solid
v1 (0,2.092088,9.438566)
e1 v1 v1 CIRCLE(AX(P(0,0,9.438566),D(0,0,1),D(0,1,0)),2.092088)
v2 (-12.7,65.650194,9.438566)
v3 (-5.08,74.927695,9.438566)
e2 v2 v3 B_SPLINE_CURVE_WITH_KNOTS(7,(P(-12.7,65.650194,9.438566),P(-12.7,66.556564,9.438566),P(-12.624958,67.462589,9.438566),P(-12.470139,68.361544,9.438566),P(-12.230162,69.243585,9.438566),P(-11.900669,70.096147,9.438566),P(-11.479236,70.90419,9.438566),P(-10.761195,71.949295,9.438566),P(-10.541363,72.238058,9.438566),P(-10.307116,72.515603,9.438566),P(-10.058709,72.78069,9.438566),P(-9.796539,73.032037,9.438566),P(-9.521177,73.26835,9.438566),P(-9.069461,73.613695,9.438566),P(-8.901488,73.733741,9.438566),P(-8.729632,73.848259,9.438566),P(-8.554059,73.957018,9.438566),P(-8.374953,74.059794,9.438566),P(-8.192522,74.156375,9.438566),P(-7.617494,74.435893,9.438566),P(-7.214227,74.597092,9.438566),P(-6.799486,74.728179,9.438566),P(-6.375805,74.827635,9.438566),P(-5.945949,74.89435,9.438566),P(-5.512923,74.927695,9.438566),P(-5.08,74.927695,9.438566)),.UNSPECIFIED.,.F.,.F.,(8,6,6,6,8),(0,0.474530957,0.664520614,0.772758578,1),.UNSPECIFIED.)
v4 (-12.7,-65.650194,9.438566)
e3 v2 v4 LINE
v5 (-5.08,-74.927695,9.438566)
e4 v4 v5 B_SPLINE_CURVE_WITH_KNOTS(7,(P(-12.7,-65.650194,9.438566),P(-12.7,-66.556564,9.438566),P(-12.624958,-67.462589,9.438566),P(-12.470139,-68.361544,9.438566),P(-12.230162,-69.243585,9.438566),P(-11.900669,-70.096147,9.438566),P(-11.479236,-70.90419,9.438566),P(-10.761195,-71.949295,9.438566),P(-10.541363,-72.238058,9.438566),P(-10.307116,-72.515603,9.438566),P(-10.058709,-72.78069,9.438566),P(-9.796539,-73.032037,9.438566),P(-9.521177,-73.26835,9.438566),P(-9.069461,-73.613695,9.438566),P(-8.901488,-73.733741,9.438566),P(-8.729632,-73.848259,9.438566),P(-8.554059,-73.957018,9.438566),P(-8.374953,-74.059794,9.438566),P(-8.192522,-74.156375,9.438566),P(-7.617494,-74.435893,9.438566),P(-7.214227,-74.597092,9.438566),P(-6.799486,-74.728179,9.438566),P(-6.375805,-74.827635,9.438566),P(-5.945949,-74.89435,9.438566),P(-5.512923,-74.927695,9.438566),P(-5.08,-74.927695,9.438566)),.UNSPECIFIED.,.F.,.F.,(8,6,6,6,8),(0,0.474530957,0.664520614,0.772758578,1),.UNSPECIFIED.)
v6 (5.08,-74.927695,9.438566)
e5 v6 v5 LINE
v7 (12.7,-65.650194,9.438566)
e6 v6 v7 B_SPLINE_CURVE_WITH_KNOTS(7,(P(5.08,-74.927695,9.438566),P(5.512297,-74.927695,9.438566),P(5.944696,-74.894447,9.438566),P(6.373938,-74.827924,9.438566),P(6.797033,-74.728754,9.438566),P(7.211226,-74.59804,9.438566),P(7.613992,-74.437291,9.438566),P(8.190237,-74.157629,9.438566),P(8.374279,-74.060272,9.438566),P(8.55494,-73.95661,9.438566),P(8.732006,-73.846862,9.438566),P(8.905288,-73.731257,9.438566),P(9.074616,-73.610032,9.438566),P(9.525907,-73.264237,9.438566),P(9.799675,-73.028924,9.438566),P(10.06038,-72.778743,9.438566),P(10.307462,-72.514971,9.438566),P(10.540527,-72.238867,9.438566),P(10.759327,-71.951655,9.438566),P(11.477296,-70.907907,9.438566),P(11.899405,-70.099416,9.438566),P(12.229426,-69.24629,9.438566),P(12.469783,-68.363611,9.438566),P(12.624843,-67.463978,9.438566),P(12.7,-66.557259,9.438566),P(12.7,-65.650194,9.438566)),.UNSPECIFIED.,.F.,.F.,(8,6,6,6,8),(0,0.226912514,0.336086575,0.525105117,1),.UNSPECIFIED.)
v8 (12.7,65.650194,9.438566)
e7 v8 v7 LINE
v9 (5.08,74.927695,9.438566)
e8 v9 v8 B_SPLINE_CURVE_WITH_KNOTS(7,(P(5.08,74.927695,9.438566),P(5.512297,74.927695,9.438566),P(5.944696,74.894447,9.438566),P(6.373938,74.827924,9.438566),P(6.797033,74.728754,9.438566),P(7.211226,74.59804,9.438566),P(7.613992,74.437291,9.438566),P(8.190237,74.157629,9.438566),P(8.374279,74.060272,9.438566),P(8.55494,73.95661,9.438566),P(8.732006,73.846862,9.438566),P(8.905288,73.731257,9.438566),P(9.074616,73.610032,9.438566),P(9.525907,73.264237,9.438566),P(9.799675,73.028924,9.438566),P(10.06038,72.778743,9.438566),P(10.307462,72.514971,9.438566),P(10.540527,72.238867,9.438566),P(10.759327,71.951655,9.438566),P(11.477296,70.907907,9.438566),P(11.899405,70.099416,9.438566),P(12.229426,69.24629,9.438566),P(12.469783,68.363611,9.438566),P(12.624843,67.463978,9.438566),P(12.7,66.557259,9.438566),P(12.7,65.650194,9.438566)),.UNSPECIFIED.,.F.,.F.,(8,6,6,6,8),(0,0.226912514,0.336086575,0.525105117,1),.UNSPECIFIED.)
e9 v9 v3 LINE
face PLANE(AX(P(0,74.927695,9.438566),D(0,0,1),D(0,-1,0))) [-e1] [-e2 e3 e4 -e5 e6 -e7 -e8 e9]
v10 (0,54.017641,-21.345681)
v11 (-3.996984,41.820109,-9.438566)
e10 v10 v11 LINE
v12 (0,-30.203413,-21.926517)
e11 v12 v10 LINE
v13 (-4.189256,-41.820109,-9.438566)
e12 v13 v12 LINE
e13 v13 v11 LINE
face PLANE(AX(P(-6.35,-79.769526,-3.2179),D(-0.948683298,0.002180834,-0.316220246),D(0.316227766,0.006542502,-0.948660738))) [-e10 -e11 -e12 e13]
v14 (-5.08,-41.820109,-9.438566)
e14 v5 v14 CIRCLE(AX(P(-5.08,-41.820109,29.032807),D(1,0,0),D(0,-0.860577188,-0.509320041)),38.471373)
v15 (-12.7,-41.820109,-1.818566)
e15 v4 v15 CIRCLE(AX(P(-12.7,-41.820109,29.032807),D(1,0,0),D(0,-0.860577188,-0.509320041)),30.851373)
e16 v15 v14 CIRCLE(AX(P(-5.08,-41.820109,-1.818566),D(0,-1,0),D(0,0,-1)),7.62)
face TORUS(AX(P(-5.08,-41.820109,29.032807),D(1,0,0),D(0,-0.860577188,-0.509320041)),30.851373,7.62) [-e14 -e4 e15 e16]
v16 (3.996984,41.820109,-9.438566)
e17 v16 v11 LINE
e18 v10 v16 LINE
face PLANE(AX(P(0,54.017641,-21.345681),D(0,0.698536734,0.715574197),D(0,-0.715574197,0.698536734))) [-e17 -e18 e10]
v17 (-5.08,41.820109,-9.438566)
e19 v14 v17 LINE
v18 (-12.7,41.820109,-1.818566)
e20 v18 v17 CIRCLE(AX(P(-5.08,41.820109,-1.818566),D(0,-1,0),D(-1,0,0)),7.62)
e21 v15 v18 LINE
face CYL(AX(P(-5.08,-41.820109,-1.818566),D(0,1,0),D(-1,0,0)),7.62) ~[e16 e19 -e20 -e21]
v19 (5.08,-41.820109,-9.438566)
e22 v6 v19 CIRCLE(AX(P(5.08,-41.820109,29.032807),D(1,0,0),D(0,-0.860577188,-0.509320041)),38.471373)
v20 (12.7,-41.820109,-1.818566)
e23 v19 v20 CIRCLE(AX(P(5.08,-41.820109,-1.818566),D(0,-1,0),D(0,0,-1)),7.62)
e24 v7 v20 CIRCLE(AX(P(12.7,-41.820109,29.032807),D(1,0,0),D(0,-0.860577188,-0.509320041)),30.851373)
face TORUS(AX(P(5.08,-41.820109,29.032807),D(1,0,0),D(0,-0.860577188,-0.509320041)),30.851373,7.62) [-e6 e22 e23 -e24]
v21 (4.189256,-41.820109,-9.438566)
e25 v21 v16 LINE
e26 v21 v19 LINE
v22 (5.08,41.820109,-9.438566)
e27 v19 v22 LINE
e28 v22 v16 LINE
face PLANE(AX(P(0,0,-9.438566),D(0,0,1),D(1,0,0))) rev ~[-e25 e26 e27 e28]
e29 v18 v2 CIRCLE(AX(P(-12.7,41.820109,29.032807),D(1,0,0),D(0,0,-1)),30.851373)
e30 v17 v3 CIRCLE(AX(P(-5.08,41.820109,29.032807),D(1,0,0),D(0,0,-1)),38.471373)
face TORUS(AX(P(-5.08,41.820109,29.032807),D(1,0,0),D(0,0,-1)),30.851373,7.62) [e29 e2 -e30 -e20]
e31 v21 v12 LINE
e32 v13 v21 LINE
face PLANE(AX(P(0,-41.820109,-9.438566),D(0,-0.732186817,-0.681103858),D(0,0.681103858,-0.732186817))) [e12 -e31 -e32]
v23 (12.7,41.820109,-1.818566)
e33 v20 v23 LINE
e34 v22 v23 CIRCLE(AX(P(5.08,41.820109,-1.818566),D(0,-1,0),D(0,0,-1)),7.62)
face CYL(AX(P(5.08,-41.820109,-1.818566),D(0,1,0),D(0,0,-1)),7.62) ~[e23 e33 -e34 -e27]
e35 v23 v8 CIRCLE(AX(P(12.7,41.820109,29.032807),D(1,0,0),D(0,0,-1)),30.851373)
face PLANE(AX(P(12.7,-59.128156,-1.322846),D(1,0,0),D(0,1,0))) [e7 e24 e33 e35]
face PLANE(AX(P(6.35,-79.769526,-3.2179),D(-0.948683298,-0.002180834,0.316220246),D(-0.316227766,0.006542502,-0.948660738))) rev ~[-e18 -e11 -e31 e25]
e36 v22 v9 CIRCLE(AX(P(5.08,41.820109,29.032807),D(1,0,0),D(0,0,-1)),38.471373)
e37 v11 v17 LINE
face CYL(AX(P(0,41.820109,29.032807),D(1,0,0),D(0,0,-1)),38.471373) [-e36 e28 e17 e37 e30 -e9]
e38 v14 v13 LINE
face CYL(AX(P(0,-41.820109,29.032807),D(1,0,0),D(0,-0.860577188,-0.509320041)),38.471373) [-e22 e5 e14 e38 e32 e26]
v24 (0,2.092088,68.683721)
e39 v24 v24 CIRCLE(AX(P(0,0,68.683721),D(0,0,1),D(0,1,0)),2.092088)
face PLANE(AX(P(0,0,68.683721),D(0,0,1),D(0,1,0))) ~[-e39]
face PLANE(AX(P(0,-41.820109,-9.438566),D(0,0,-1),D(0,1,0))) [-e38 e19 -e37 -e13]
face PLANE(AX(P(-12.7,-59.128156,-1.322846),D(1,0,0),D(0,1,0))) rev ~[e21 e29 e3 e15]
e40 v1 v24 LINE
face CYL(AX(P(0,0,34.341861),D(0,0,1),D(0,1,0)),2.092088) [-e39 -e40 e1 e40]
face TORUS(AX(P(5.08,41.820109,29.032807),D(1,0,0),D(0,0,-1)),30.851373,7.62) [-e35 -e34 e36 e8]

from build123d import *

# Parameters (mm, degrees)
F0_W        = 83.6402177811
F0_H        = 18.8771318644
F1_DEPTH    = 12.7
F2_DEPTH    = 6.35
F3_T4_DEPTH = 183.094881238
F4_T4_DEPTH = 183.094881238
F5_R        = 7.62
F6_R        = 7.62
F7_W        = 2.0920878742
F7_H        = 68.6837211251


# Not quite as in the source:
# - a fillet or chamfer that OpenCascade refuses, or shapes differently, is made with other operations: its cross-section is extruded or revolved along the edge and cut away or added


with BuildPart() as f1:
    # F0 (on Right) → F1 (new body, symmetric)
    with BuildSketch(Plane.YZ):
        with BuildLine():
            ThreePointArc((-74.9276950955, 9.4385659322), (-60.8756748212, -4.3877247968), (-41.8201088905, -9.4385659322))
            Line((-41.8201088905, -9.4385659322), (-74.9276950955, 9.4385659322))
        make_face()
        with BuildLine():
            Line((74.9276950955, 9.4385659322), (41.8201088905, -9.4385659322))
            ThreePointArc((41.8201088905, -9.4385659322), (60.8756748212, -4.3877247968), (74.9276950955, 9.4385659322))
        make_face()
        Polygon((74.9276950955, 9.4385659322), (41.8201088905, 9.4385659322), (41.8201088905, -9.4385659322), align=None)
        Rectangle(F0_W, F0_H)
        Polygon((-41.8201088905, -9.4385659322), (-41.8201088905, 9.4385659322), (-74.9276950955, 9.4385659322), align=None)
    extrude(amount=F1_DEPTH, both=True)

    # F0 (on Right) → F2 (join, symmetric)
    with BuildSketch(Plane.YZ):
        Polygon((41.8201088905, -9.4385659322), (-41.8201088905, -9.4385659322), (-30.2034132183, -21.926516667), (54.0176406503, -21.3456805795), align=None)
    extrude(amount=F2_DEPTH, both=True)

    # F3: chamfer of 19.05 x 6.35 on 1 edges, made by hand


with BuildPart() as f3_tool2:
    # F3_s3 → F3_t4 (new body)
    with BuildSketch(Plane(origin=(0, -79.7879238623, -0.5502627122), x_dir=(1, 0, 0), z_dir=(0, 0.9999762195, 0.0068964024))):
        Polygon((-6.35, 2.6677003539), (0, 21.7177003539), (-6.35, 21.7177003539), align=None)
    extrude(amount=F3_T4_DEPTH)

    split(bisect_by=Plane.XY.offset(-9.4385659322), keep=Keep.BOTTOM)


with BuildPart() as f1_1:
    add(f1.part)

    # F3_t1: cut F3_tool2
    add(f3_tool2.part, mode=Mode.SUBTRACT)

    # F4: chamfer of 6.35 x 19.05 on 1 edges, made by hand


with BuildPart() as f4_tool2:
    # F4_s3 → F4_t4 (new body)
    with BuildSketch(Plane(origin=(0, -79.7879238623, -0.5502627122), x_dir=(1, 0, 0), z_dir=(0, 0.9999762195, 0.0068964024))):
        Polygon((6.35, 2.6677003539), (0, 21.7177003539), (6.35, 21.7177003539), align=None)
    extrude(amount=F4_T4_DEPTH)

    split(bisect_by=Plane.XY.offset(-9.4385659322), keep=Keep.BOTTOM)


with BuildPart() as f1_2:
    add(f1_1.part)

    # F4_t1: cut F4_tool2
    add(f4_tool2.part, mode=Mode.SUBTRACT)

    # F5
    f5_edges = [f1_2.edges().sort_by_distance(p)[0] for p in [
        (-12.7, 60.875675, -4.387725),
        (-12.7, 0, -9.438566),
        (-12.7, -60.875675, -4.387725),
    ]]
    fillet(f5_edges, radius=F5_R)

    # F6
    f6_edges = [f1_2.edges().sort_by_distance(p)[0] for p in [
        (12.7, -60.875675, -4.387725),
        (12.7, 0, -9.438566),
        (12.7, 60.875675, -4.387725),
    ]]
    fillet(f6_edges, radius=F6_R)

    # F7 (on Right) → F8 (revolve)
    with BuildSketch(Plane.YZ):
        with Locations((1.0460439371, 34.3418605626)):
            Rectangle(F7_W, F7_H)
    revolve(axis=Axis((0, 0, 34.3418605626), (0, 0, 1)))


solid = f1_2.part
